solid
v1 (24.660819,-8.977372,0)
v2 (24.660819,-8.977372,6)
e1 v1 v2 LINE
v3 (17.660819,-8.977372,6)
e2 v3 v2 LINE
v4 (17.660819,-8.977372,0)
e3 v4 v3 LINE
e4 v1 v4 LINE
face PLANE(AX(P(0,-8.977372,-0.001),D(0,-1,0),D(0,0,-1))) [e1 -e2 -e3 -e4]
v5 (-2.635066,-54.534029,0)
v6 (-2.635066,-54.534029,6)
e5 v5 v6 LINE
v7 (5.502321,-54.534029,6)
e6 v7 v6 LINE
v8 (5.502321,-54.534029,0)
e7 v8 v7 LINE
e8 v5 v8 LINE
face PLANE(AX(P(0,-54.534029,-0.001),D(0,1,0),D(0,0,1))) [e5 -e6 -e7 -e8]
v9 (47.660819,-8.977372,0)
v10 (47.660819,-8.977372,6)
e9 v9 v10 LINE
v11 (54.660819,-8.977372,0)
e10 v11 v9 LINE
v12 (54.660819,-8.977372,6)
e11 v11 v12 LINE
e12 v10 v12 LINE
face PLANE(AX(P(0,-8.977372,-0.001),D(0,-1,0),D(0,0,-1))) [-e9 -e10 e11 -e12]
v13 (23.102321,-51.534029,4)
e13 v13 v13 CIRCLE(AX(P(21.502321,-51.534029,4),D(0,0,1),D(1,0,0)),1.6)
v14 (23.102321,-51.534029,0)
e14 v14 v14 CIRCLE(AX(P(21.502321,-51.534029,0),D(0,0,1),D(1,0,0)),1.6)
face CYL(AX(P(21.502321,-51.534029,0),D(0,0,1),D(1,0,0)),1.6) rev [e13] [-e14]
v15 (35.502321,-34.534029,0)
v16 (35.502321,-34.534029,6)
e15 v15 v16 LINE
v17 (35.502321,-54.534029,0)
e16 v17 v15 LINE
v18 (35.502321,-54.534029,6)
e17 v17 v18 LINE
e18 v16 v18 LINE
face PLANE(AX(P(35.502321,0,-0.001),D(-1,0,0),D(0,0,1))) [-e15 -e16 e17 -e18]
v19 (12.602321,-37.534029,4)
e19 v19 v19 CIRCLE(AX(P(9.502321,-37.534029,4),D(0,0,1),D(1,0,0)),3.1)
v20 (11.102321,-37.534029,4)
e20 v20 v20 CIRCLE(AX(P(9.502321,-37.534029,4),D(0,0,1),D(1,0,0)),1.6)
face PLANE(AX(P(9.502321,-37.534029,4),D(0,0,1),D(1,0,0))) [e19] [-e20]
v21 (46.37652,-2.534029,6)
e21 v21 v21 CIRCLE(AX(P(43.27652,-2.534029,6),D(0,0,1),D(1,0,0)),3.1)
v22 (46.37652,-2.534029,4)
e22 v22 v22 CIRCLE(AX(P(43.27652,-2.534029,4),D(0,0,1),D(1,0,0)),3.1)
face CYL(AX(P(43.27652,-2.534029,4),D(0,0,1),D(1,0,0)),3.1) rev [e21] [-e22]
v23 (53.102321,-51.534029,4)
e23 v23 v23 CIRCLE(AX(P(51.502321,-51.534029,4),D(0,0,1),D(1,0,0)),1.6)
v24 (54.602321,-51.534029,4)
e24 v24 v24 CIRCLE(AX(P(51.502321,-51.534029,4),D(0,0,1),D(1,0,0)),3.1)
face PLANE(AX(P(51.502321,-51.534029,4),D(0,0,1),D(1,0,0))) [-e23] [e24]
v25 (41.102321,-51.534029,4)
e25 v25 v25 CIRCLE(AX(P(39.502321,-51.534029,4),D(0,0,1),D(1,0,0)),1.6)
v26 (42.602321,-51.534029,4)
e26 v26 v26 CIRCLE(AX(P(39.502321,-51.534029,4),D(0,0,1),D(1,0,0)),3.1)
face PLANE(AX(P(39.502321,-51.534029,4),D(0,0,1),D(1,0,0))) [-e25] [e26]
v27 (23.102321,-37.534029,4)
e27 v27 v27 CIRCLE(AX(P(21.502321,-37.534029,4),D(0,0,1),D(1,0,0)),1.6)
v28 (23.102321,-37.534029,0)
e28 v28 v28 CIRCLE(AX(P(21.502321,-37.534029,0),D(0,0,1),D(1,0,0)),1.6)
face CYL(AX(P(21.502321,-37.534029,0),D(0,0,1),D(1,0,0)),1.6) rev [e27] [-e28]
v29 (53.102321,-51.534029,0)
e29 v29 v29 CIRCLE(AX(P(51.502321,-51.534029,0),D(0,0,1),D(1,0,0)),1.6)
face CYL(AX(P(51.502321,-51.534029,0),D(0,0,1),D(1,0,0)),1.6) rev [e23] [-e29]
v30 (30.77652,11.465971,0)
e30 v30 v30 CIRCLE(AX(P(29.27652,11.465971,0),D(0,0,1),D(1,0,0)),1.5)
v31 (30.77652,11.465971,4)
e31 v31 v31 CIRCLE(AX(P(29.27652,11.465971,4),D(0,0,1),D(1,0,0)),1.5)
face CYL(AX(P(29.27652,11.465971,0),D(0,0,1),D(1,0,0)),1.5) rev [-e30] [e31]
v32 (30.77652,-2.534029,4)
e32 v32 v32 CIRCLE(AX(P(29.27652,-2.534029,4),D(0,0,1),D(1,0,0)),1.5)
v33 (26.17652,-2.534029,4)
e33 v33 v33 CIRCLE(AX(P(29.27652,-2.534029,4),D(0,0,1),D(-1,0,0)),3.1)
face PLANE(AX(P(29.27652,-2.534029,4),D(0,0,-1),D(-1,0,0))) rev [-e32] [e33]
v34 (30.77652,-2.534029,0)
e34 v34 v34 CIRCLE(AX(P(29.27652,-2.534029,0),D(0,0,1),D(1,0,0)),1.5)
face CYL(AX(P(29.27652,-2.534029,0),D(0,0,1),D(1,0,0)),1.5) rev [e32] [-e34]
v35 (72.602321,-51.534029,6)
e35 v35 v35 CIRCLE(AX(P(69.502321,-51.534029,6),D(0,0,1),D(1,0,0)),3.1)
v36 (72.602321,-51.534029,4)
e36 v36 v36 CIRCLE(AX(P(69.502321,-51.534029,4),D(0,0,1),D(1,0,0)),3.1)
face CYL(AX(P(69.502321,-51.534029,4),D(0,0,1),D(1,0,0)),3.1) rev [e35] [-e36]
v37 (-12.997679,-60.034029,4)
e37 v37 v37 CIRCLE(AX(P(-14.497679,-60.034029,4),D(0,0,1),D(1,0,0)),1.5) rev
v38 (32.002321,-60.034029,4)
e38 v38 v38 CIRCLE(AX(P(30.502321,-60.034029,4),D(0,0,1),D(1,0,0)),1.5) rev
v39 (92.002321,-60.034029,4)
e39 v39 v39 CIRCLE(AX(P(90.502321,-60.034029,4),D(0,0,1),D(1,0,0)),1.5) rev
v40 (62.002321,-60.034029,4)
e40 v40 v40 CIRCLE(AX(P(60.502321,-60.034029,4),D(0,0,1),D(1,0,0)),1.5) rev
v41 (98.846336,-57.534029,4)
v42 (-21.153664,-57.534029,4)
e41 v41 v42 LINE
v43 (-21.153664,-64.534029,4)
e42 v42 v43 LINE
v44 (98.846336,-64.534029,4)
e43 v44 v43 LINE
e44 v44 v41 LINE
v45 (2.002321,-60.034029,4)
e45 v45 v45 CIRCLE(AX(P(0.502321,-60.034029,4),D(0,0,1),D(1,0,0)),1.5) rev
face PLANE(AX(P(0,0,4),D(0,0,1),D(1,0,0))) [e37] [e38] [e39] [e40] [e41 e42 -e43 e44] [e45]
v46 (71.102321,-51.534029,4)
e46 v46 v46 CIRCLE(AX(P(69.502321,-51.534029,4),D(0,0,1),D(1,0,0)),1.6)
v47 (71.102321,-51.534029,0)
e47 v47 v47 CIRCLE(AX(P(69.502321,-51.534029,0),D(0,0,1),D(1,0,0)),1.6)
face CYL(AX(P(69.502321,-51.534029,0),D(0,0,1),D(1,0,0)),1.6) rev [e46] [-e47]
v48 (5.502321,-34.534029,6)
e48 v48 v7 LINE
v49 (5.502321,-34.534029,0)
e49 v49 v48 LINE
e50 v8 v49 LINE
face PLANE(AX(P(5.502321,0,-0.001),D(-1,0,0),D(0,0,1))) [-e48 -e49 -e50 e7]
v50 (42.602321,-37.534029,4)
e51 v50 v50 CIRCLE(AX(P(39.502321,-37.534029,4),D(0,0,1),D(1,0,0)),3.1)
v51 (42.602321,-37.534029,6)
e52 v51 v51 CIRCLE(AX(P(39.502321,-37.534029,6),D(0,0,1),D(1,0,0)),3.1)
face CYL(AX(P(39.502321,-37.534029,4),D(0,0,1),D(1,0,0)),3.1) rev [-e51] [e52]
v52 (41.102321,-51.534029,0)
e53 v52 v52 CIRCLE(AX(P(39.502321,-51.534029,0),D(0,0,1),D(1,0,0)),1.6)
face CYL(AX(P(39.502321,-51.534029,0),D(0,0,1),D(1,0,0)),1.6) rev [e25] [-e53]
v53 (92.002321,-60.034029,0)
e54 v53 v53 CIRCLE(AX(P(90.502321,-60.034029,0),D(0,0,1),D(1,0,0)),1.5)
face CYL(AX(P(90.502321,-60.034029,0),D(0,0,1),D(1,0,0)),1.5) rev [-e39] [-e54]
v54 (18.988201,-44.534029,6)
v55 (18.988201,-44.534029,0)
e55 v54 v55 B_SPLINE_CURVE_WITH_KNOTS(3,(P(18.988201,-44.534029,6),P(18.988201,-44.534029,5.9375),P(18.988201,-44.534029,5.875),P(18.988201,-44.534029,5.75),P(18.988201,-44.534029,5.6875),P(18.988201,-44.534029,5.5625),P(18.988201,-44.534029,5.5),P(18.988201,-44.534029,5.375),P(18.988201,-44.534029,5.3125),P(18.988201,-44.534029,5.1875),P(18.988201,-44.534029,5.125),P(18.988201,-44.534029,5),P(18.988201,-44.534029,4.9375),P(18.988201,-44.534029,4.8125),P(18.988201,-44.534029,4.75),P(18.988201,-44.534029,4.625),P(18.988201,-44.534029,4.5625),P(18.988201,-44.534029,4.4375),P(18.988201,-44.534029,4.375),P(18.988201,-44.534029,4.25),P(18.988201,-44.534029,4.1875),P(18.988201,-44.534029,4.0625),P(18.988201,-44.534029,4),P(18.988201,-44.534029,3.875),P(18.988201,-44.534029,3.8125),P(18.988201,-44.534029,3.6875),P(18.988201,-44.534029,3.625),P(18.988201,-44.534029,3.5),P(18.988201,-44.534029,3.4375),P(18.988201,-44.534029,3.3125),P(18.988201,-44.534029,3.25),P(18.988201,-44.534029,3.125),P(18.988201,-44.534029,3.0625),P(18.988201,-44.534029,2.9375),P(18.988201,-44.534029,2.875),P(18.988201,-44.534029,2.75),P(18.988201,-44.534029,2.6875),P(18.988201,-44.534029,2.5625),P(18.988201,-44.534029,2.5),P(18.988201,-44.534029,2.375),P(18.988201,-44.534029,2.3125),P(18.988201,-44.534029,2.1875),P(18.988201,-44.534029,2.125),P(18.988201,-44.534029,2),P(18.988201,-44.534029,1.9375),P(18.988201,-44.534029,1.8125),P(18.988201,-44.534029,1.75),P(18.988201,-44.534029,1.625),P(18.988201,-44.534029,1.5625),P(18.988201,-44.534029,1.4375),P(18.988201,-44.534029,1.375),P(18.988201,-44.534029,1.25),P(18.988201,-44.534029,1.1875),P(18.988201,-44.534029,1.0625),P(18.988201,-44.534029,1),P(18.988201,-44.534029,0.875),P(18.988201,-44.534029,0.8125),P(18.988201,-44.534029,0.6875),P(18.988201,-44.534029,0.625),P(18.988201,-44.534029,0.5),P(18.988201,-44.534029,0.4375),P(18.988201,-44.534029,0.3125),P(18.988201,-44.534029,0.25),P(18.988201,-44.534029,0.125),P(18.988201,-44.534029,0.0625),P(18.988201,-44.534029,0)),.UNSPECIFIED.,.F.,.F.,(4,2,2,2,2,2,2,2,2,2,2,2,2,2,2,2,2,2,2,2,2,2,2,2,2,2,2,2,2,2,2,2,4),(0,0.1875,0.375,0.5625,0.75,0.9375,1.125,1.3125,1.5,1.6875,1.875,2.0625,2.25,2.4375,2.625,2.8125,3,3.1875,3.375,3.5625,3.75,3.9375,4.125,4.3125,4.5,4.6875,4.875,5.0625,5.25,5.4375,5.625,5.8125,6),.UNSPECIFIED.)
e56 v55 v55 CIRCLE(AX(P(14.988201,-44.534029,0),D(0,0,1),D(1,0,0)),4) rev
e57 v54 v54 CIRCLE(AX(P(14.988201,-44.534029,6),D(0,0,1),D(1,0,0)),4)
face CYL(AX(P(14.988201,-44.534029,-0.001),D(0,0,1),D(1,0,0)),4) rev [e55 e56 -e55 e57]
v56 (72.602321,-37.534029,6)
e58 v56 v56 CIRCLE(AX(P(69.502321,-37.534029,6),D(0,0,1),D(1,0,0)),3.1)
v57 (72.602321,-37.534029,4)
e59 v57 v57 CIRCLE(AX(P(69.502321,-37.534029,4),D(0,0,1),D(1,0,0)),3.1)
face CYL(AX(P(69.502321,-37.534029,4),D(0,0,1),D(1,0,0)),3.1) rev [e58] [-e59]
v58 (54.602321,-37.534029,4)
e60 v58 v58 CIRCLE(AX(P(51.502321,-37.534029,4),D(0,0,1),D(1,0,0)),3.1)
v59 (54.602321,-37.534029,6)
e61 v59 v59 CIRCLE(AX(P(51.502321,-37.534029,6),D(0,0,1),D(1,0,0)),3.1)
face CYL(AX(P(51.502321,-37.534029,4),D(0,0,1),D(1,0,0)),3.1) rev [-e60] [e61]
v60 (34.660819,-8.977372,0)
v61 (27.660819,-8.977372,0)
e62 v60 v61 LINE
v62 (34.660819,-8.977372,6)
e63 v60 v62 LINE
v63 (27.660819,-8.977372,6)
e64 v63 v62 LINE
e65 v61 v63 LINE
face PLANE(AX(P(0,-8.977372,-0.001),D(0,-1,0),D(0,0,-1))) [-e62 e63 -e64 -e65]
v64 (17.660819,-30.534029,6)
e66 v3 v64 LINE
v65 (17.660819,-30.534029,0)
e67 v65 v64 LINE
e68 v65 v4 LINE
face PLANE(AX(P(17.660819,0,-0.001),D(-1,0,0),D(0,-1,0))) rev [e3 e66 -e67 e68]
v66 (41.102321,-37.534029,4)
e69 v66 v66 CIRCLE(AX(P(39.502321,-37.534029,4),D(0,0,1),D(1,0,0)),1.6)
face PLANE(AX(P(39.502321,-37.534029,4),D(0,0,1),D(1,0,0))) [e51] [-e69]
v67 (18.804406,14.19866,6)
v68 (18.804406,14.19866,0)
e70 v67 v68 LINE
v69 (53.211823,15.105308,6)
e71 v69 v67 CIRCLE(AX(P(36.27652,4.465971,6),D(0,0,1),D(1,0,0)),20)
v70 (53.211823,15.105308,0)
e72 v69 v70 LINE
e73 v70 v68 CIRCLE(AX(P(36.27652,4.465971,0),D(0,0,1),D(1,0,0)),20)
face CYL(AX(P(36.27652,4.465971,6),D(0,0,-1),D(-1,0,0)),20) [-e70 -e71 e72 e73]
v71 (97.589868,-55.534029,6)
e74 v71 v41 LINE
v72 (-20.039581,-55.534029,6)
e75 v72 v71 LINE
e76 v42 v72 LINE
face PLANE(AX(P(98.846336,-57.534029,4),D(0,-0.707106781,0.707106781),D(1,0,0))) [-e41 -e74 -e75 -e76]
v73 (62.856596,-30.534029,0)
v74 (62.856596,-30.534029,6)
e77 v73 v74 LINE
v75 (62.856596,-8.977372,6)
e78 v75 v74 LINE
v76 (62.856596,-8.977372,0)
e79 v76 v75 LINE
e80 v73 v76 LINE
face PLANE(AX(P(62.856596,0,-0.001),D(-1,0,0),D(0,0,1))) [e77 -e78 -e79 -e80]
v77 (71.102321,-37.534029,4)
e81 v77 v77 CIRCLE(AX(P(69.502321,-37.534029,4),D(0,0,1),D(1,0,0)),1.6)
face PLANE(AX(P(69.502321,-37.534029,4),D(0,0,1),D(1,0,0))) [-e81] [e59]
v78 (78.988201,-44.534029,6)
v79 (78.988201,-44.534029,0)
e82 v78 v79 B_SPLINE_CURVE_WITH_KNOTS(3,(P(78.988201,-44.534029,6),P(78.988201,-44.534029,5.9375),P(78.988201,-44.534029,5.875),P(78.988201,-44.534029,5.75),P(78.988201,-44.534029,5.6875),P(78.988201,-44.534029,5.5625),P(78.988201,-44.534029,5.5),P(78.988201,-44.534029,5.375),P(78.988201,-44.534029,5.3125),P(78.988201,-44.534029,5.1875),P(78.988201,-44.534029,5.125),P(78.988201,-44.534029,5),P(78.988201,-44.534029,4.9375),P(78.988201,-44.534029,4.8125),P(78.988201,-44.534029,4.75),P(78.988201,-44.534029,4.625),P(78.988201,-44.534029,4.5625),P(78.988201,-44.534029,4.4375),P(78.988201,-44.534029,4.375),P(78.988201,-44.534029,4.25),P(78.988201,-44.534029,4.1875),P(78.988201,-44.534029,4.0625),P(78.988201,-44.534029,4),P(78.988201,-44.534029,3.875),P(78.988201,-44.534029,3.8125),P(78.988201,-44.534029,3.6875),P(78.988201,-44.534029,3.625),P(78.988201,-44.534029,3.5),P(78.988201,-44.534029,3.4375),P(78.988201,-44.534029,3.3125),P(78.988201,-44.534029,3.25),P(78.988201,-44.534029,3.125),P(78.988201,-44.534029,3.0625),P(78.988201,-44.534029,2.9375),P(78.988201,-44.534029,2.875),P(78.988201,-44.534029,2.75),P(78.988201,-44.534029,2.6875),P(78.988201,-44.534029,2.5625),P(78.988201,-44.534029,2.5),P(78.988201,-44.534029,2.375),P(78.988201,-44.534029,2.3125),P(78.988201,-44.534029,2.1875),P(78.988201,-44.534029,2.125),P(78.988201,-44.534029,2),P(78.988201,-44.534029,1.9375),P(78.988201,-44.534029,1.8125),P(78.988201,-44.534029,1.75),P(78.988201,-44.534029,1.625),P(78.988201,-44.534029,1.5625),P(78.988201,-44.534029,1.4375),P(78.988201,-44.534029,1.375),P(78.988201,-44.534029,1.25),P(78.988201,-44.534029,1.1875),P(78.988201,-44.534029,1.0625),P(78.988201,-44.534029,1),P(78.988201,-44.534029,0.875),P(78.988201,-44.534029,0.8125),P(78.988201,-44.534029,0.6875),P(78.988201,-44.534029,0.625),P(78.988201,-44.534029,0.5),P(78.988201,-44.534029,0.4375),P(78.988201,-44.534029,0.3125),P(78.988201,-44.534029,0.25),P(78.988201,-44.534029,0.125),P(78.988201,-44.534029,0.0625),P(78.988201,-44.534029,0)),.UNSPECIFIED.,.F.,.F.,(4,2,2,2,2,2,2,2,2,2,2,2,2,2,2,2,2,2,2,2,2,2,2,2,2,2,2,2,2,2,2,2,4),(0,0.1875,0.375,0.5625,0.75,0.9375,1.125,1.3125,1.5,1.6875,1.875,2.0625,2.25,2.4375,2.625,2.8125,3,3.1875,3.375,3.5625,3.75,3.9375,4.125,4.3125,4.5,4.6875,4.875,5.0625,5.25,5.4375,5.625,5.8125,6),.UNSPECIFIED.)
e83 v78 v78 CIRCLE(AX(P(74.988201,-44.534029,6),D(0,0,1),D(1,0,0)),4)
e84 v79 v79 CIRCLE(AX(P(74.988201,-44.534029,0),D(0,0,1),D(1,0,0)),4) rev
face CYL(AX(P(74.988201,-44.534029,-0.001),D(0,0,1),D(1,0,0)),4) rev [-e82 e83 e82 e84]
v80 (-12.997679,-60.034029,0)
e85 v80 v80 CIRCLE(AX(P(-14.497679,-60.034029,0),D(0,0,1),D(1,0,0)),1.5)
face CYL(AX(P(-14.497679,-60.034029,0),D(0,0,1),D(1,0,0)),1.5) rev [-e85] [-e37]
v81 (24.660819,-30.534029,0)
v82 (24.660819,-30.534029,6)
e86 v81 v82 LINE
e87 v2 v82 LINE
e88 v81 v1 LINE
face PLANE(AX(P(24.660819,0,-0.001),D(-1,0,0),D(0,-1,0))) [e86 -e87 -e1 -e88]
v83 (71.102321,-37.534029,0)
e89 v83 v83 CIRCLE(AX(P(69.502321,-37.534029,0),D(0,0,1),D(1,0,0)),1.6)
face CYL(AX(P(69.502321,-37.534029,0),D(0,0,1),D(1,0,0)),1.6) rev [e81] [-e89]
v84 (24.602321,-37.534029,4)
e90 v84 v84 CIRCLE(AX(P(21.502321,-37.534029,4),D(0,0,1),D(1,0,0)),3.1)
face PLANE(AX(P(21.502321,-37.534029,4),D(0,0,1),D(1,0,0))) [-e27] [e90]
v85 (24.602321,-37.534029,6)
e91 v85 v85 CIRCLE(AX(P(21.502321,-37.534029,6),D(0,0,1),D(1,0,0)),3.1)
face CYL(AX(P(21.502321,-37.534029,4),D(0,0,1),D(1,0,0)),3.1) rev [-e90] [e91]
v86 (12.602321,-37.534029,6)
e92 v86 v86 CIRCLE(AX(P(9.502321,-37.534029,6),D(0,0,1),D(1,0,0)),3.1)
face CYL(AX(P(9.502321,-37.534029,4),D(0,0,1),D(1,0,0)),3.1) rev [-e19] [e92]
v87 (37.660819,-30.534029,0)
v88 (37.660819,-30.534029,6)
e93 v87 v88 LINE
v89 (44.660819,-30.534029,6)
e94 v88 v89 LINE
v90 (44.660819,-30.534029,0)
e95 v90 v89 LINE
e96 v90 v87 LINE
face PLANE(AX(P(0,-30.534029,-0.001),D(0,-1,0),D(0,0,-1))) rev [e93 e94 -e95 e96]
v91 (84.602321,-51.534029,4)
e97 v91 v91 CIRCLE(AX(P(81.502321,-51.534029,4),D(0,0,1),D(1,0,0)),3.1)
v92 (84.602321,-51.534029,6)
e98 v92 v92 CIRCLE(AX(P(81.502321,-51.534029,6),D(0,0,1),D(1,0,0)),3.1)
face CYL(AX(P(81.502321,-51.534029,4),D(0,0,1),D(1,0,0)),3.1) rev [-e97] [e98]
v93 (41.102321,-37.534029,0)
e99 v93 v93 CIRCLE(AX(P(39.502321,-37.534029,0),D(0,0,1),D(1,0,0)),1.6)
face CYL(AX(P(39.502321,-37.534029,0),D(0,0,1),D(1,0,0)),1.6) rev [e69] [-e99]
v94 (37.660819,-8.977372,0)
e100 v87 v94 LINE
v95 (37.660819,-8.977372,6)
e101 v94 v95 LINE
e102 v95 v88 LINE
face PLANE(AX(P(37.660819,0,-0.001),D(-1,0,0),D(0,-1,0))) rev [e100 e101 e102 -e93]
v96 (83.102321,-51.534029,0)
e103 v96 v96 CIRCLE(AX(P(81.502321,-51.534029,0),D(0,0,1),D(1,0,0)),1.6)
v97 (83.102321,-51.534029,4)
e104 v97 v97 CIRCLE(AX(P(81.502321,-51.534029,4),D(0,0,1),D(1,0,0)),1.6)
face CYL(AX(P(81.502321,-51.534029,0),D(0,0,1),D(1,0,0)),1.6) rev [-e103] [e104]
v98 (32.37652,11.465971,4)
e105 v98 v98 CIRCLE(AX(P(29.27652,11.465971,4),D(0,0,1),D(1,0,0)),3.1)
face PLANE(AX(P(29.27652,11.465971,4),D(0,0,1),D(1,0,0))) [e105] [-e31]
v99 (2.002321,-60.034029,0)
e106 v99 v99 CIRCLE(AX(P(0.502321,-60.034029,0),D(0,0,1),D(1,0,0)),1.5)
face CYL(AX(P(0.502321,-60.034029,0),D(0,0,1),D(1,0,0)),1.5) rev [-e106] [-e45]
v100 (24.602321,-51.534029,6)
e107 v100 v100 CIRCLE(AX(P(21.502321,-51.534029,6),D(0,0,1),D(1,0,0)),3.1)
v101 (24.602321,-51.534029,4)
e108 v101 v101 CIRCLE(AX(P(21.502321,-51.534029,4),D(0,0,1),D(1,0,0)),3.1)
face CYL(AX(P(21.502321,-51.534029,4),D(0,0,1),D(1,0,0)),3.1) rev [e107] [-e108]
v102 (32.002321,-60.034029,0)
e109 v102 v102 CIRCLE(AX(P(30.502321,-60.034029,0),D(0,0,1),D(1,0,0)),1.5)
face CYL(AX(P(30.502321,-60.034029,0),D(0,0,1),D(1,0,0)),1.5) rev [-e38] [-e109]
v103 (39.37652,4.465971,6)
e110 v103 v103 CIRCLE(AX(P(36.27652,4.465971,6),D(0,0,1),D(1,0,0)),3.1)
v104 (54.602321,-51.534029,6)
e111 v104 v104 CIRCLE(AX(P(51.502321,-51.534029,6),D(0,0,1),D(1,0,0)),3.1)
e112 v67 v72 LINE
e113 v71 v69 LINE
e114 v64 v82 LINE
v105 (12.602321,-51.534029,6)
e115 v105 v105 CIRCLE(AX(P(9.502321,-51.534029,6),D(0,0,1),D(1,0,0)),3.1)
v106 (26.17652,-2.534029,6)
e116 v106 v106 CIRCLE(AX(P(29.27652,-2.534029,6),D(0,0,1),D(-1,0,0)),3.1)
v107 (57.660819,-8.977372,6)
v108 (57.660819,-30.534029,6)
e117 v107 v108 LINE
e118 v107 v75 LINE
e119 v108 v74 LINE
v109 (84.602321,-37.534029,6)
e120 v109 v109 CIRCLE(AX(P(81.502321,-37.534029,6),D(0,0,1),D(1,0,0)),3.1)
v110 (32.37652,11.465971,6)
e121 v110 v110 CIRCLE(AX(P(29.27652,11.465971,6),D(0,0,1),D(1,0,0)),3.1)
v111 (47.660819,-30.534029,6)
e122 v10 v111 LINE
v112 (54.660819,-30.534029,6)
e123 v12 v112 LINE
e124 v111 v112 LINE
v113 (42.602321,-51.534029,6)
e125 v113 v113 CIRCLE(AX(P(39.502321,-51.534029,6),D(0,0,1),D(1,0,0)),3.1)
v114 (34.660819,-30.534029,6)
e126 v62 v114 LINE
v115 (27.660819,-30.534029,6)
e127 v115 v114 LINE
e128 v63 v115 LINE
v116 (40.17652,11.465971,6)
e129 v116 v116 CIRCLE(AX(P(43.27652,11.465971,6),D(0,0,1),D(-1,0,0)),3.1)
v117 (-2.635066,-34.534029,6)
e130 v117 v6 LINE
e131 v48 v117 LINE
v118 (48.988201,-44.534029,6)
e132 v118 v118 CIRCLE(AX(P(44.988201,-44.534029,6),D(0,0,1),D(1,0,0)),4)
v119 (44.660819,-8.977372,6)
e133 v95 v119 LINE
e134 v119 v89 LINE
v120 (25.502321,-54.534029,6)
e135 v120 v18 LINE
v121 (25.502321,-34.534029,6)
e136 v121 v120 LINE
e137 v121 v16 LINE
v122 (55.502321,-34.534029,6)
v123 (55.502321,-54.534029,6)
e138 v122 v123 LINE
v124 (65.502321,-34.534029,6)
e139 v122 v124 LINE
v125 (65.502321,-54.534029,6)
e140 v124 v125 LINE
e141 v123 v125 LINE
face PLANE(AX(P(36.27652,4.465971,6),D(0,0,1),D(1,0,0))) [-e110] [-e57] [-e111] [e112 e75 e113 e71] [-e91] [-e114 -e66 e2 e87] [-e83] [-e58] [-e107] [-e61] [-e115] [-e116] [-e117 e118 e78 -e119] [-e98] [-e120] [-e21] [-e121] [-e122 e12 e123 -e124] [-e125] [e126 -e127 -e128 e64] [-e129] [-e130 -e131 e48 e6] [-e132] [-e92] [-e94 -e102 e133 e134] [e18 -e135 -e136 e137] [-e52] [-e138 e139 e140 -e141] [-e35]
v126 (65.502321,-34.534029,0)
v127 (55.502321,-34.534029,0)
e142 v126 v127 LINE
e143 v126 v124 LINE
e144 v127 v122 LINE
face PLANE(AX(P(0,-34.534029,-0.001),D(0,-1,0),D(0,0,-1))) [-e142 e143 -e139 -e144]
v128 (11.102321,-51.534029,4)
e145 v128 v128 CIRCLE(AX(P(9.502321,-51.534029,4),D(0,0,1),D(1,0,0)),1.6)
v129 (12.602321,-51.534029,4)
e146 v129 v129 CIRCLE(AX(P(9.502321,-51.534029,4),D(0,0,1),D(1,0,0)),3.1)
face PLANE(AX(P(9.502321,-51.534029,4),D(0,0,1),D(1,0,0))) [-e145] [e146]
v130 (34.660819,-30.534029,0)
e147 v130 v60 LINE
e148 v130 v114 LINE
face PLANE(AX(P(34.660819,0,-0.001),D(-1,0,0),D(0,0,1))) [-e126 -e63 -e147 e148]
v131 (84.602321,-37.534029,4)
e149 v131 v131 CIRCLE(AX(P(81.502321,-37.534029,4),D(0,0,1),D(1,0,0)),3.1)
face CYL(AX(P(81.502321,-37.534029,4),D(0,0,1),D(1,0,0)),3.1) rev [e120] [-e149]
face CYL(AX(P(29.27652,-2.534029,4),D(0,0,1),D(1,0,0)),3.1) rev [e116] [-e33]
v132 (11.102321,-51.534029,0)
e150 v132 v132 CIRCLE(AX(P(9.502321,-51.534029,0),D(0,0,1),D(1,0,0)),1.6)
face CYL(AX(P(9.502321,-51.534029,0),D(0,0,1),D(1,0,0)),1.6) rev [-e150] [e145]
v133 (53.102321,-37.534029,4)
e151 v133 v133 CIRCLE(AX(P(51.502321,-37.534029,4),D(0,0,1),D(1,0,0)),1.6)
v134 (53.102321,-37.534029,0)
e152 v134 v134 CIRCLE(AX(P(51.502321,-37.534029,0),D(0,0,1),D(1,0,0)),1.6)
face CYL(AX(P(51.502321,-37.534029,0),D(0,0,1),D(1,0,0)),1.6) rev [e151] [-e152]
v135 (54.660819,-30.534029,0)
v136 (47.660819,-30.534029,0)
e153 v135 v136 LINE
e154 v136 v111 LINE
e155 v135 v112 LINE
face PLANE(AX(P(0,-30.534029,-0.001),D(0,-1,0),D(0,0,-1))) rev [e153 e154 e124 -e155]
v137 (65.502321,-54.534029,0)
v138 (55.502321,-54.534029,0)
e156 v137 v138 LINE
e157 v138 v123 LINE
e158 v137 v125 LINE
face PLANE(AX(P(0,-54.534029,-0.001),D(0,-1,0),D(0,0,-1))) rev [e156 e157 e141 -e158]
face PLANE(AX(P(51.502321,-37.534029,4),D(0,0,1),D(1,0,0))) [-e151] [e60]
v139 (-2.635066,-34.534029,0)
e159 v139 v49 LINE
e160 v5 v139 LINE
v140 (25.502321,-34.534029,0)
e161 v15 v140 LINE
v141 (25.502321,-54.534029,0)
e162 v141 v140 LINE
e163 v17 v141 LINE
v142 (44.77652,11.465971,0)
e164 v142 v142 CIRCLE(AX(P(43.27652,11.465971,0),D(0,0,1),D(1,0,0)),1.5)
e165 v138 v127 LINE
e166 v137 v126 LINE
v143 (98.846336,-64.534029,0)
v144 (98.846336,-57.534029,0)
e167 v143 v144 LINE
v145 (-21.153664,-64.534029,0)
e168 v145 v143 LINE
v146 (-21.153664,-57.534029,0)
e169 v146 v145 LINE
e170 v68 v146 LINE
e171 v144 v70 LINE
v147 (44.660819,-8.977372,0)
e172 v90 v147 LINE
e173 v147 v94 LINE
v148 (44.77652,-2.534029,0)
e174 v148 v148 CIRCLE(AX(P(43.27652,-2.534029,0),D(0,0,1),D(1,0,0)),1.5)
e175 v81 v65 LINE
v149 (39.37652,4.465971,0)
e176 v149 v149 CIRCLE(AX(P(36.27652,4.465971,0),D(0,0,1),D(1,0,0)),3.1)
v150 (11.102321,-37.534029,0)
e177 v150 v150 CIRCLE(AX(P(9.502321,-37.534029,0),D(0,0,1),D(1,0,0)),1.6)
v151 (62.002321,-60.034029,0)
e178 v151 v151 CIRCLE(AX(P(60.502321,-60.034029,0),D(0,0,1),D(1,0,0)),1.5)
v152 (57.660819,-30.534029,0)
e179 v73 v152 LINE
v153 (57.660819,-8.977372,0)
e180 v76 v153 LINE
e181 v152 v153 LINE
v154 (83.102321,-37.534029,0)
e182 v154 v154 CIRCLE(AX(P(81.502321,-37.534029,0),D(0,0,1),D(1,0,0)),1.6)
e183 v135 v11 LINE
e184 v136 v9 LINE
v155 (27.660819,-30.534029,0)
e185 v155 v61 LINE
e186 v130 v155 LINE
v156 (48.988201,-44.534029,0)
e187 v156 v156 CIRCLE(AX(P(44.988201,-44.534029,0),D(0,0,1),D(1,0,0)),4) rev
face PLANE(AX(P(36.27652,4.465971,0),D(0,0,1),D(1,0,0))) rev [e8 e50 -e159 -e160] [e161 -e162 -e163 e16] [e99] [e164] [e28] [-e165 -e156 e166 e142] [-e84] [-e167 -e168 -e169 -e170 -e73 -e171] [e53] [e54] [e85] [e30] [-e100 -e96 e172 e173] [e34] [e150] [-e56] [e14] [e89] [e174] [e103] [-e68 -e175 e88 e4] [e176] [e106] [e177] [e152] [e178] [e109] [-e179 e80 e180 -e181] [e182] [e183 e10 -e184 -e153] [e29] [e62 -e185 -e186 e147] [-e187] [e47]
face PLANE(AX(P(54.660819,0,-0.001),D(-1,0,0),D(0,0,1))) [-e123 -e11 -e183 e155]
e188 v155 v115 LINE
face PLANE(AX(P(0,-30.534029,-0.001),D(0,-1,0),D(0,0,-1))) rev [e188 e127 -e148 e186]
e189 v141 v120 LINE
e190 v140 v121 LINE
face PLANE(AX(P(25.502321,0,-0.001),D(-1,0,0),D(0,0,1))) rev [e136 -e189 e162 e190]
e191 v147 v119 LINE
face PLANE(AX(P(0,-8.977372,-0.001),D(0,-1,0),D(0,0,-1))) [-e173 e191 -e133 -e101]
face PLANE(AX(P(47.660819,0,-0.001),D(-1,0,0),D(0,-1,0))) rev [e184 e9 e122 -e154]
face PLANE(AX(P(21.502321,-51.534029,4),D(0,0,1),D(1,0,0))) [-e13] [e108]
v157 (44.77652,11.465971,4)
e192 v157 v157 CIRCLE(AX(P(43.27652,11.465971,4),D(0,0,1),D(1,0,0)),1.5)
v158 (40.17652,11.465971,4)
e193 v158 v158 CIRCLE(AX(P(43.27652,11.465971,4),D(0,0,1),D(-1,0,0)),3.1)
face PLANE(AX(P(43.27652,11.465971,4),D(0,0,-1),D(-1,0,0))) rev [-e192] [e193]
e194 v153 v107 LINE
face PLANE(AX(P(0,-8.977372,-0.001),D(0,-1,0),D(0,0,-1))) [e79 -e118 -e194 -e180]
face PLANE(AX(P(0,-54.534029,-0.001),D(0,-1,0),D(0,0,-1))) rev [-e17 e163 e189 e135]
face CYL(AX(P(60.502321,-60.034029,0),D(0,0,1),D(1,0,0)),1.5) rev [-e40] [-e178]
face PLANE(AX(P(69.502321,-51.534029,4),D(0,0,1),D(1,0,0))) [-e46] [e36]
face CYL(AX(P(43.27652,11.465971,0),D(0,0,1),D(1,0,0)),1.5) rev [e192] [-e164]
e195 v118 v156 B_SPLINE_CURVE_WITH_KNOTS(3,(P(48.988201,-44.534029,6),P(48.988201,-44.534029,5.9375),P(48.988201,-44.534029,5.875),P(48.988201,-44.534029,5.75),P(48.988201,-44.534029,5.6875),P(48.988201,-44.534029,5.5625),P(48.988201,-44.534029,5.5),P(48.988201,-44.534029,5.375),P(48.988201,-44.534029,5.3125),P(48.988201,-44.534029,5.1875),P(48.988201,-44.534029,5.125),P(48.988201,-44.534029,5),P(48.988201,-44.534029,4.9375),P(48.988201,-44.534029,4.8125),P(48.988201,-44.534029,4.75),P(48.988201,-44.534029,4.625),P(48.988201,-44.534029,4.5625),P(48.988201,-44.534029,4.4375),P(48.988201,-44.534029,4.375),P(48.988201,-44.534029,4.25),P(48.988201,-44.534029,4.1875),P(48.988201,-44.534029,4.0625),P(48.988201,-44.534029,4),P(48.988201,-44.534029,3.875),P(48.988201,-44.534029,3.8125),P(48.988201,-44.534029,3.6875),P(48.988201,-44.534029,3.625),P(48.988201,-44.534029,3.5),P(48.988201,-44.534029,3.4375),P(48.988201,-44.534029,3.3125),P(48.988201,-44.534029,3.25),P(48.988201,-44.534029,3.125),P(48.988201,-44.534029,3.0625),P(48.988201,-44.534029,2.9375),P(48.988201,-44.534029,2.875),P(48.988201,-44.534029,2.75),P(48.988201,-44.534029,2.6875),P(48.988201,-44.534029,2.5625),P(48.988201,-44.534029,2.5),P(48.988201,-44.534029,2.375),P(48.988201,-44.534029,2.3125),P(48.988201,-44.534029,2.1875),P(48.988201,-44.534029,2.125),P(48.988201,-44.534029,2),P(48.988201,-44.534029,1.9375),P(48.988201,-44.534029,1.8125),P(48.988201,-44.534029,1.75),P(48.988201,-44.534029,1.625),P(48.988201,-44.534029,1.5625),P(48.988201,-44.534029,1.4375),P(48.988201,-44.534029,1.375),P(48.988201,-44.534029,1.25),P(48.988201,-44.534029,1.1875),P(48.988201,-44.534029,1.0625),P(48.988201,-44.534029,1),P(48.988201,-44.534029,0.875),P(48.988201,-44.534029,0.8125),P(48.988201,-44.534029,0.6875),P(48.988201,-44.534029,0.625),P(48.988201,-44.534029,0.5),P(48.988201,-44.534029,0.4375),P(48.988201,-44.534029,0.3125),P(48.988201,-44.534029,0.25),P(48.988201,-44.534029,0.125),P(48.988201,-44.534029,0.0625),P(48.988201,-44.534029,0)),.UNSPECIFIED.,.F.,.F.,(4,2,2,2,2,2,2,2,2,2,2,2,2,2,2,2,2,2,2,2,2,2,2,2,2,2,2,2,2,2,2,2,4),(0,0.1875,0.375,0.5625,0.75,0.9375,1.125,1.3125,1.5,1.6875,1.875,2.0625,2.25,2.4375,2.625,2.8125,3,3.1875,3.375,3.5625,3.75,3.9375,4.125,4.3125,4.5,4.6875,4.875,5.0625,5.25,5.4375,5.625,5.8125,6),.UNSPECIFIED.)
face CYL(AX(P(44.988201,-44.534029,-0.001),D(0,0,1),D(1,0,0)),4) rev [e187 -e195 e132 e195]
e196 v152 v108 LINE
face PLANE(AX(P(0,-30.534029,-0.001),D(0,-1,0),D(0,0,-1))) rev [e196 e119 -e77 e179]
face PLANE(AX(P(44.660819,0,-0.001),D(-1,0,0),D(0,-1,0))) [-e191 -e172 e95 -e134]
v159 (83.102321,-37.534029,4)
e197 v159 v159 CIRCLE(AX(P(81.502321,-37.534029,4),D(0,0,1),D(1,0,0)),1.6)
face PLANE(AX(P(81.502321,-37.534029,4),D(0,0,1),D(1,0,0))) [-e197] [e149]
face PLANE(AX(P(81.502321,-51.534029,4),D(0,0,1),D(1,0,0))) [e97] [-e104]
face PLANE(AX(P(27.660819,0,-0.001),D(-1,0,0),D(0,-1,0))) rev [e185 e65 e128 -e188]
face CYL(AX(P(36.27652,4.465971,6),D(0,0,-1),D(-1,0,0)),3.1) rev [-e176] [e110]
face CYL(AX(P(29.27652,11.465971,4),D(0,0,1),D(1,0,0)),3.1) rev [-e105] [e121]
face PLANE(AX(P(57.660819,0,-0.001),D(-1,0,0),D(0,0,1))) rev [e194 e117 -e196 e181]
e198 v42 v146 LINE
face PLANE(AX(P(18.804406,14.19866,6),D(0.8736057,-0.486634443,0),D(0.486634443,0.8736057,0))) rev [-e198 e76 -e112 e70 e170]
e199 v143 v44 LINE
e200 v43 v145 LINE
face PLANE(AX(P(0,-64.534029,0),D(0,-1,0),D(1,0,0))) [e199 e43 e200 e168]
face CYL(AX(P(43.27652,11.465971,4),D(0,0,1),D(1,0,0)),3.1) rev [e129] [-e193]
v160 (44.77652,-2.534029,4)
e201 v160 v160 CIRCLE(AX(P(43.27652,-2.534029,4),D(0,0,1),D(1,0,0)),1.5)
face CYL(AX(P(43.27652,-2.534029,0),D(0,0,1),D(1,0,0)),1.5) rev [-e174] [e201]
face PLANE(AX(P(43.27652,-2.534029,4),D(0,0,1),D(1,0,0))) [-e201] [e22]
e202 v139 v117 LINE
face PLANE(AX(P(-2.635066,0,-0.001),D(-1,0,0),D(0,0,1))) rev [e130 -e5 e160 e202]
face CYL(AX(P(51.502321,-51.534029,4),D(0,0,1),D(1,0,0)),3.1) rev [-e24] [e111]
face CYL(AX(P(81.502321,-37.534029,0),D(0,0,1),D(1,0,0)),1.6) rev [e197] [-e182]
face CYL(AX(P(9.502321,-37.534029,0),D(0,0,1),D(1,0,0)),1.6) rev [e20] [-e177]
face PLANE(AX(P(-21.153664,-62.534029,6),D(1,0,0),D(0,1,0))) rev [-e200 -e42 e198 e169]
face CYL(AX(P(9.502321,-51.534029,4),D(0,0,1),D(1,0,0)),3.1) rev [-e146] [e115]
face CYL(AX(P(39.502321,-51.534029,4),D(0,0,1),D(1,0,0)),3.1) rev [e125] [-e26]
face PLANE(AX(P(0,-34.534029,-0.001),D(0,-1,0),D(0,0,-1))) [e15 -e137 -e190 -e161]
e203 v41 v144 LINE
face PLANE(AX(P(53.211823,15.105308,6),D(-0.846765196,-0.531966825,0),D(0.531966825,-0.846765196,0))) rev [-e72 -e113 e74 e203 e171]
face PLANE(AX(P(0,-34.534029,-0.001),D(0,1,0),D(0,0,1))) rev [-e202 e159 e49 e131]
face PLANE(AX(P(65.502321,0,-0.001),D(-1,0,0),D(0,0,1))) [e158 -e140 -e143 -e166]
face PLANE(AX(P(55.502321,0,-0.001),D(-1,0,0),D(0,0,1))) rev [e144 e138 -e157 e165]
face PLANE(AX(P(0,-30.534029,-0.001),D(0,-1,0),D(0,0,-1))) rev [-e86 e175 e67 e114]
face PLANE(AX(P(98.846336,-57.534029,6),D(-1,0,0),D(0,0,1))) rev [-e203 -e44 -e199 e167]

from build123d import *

# Parameters (mm, degrees)
SKETCH_1_R           = 3.1
EXTRUDE_1_DEPTH      = 6
SKETCH_2_R           = 3.1
CUT_EXTRUDE_6_DEPTH  = 2
SKETCH_4_R           = 1.5
CUT_EXTRUDE_7_DEPTH  = 118.034622889
CUT_EXTRUDE_8_REACH  = 119.12
SKETCH_5_W           = 7
SKETCH_5_H           = 21.556656584
SKETCH_5_W_2         = 5.195776916
SKETCH_5_R           = 4
SKETCH_5_W_3         = 8.137387099
SKETCH_5_H_2         = 20
SKETCH_5_W_4         = 10
SKETCH_6_R           = 3.1
CUT_EXTRUDE_9_DEPTH  = 2
SKETCH_7_R           = 1.6
CUT_EXTRUDE_10_DEPTH = 118.034622889
SKETCH_8_R           = 1.5
CUT_EXTRUDE_11_DEPTH = 118.120036521
SKETCH_9_W           = 120
SKETCH_9_H           = 5
CUT_EXTRUDE_12_DEPTH = 2
CHAMFER_1_SIZE       = 2
SKETCH_10_W          = 120
SKETCH_10_H          = 4
EXTRUDE_2_DEPTH      = 2


with BuildPart() as part:
    # 草图1 → 凸台-拉伸1 (new body)
    with BuildSketch(Plane.XY):
        with BuildLine():
            Line((53.211823486, 15.105307707), (98.846336292, -57.534028788))
            Line((98.846336292, -57.534028788), (98.846336292, -62.534028788))
            Line((98.846336292, -62.534028788), (-21.153663708, -62.534028788))
            Line((-21.153663708, -62.534028788), (-21.153663708, -57.534028788))
            Line((-21.153663708, -57.534028788), (18.804405563, 14.198660069))
            ThreePointArc((18.804405563, 14.198660069), (35.749695352, 24.459031414), (53.211823486, 15.105307707))
        make_face()
        with Locations((36.276519563, 4.465971212)):
            Circle(SKETCH_1_R, mode=Mode.SUBTRACT)
    extrude(amount=EXTRUDE_1_DEPTH)

    # 草图2 → 切除-拉伸6 (cut)
    with BuildSketch(Plane.XY.offset(6)):
        with Locations((29.276519563, 11.465971212)):
            Circle(SKETCH_2_R)
        with Locations(Location((43.276519563, 11.465971212, 0), (0, 0, 180))):
            Circle(SKETCH_2_R)
        with Locations((43.276519563, -2.534028788)):
            Circle(SKETCH_2_R)
        with Locations(Location((29.276519563, -2.534028788, 0), (0, 0, 180))):
            Circle(SKETCH_2_R)
    extrude(amount=-CUT_EXTRUDE_6_DEPTH, mode=Mode.SUBTRACT)

    # 草图4 → 切除-拉伸7 (cut, through all)
    with BuildSketch(Plane.XY.offset(4)):
        with Locations((43.276519563, 11.465971212)):
            Circle(SKETCH_4_R)
        with Locations((43.276519563, -2.534028788)):
            Circle(SKETCH_4_R)
        with Locations((29.276519563, -2.534028788)):
            Circle(SKETCH_4_R)
        with Locations((29.276519563, 11.465971212)):
            Circle(SKETCH_4_R)
    extrude(amount=-CUT_EXTRUDE_7_DEPTH, mode=Mode.SUBTRACT)

    # 草图5 → 切除-拉伸8 (cut, up to next)
    with BuildSketch(Plane.XY.offset(6), mode=Mode.PRIVATE) as cut_extrude_8_sk1:
        with Locations((21.160819148, -19.755700496)):
            Rectangle(SKETCH_5_W, SKETCH_5_H)
    cut_extrude_8_tool1 = extrude(cut_extrude_8_sk1.sketch, amount=-CUT_EXTRUDE_8_REACH, mode=Mode.PRIVATE) & part.part
    # 草图5 → 切除-拉伸8 (cut, up to next)
    with BuildSketch(Plane.XY.offset(6), mode=Mode.PRIVATE) as cut_extrude_8_sk2:
        with Locations((31.160819148, -19.755700496)):
            Rectangle(SKETCH_5_W, SKETCH_5_H)
    cut_extrude_8_tool2 = extrude(cut_extrude_8_sk2.sketch, amount=-CUT_EXTRUDE_8_REACH, mode=Mode.PRIVATE) & part.part
    # 草图5 → 切除-拉伸8 (cut, up to next)
    with BuildSketch(Plane.XY.offset(6), mode=Mode.PRIVATE) as cut_extrude_8_sk3:
        with Locations((41.160819148, -19.755700496)):
            Rectangle(SKETCH_5_W, SKETCH_5_H)
    cut_extrude_8_tool3 = extrude(cut_extrude_8_sk3.sketch, amount=-CUT_EXTRUDE_8_REACH, mode=Mode.PRIVATE) & part.part
    # 草图5 → 切除-拉伸8 (cut, up to next)
    with BuildSketch(Plane.XY.offset(6), mode=Mode.PRIVATE) as cut_extrude_8_sk4:
        with Locations((51.160819148, -19.755700496)):
            Rectangle(SKETCH_5_W, SKETCH_5_H)
    cut_extrude_8_tool4 = extrude(cut_extrude_8_sk4.sketch, amount=-CUT_EXTRUDE_8_REACH, mode=Mode.PRIVATE) & part.part
    # 草图5 → 切除-拉伸8 (cut, up to next)
    with BuildSketch(Plane.XY.offset(6), mode=Mode.PRIVATE) as cut_extrude_8_sk5:
        with Locations((60.258707606, -19.755700496)):
            Rectangle(SKETCH_5_W_2, SKETCH_5_H)
    cut_extrude_8_tool5 = extrude(cut_extrude_8_sk5.sketch, amount=-CUT_EXTRUDE_8_REACH, mode=Mode.PRIVATE) & part.part
    # 草图5 → 切除-拉伸8 (cut, up to next)
    with BuildSketch(Plane.XY.offset(6), mode=Mode.PRIVATE) as cut_extrude_8_sk6:
        with Locations((14.988200827, -44.534028788)):
            Circle(SKETCH_5_R)
    cut_extrude_8_tool6 = extrude(cut_extrude_8_sk6.sketch, amount=-CUT_EXTRUDE_8_REACH, mode=Mode.PRIVATE) & part.part
    # 草图5 → 切除-拉伸8 (cut, up to next)
    with BuildSketch(Plane.XY.offset(6), mode=Mode.PRIVATE) as cut_extrude_8_sk7:
        with Locations((44.988200827, -44.534028788)):
            Circle(SKETCH_5_R)
    cut_extrude_8_tool7 = extrude(cut_extrude_8_sk7.sketch, amount=-CUT_EXTRUDE_8_REACH, mode=Mode.PRIVATE) & part.part
    # 草图5 → 切除-拉伸8 (cut, up to next)
    with BuildSketch(Plane.XY.offset(6), mode=Mode.PRIVATE) as cut_extrude_8_sk8:
        with Locations((74.988200827, -44.534028788)):
            Circle(SKETCH_5_R)
    cut_extrude_8_tool8 = extrude(cut_extrude_8_sk8.sketch, amount=-CUT_EXTRUDE_8_REACH, mode=Mode.PRIVATE) & part.part
    # 草图5 → 切除-拉伸8 (cut, up to next)
    with BuildSketch(Plane.XY.offset(6), mode=Mode.PRIVATE) as cut_extrude_8_sk9:
        with Locations((1.433627507, -44.534028788)):
            Rectangle(SKETCH_5_W_3, SKETCH_5_H_2)
    cut_extrude_8_tool9 = extrude(cut_extrude_8_sk9.sketch, amount=-CUT_EXTRUDE_8_REACH, mode=Mode.PRIVATE) & part.part
    # 草图5 → 切除-拉伸8 (cut, up to next)
    with BuildSketch(Plane.XY.offset(6), mode=Mode.PRIVATE) as cut_extrude_8_sk10:
        with Locations((30.502321056, -44.534028788)):
            Rectangle(SKETCH_5_W_4, SKETCH_5_H_2)
    cut_extrude_8_tool10 = extrude(cut_extrude_8_sk10.sketch, amount=-CUT_EXTRUDE_8_REACH, mode=Mode.PRIVATE) & part.part
    # 草图5 → 切除-拉伸8 (cut, up to next)
    with BuildSketch(Plane.XY.offset(6), mode=Mode.PRIVATE) as cut_extrude_8_sk11:
        with Locations((60.502321056, -44.534028788)):
            Rectangle(SKETCH_5_W_4, SKETCH_5_H_2)
    cut_extrude_8_tool11 = extrude(cut_extrude_8_sk11.sketch, amount=-CUT_EXTRUDE_8_REACH, mode=Mode.PRIVATE) & part.part
    add(cut_extrude_8_tool1.solids().sort_by_distance((21.160819, -19.7557, 6))[0], mode=Mode.SUBTRACT)
    add(cut_extrude_8_tool2.solids().sort_by_distance((31.160819, -19.7557, 6))[0], mode=Mode.SUBTRACT)
    add(cut_extrude_8_tool3.solids().sort_by_distance((41.160819, -19.7557, 6))[0], mode=Mode.SUBTRACT)
    add(cut_extrude_8_tool4.solids().sort_by_distance((51.160819, -19.7557, 6))[0], mode=Mode.SUBTRACT)
    add(cut_extrude_8_tool5.solids().sort_by_distance((60.258708, -19.7557, 6))[0], mode=Mode.SUBTRACT)
    add(cut_extrude_8_tool6.solids().sort_by_distance((14.988201, -44.534029, 6))[0], mode=Mode.SUBTRACT)
    add(cut_extrude_8_tool7.solids().sort_by_distance((44.988201, -44.534029, 6))[0], mode=Mode.SUBTRACT)
    add(cut_extrude_8_tool8.solids().sort_by_distance((74.988201, -44.534029, 6))[0], mode=Mode.SUBTRACT)
    add(cut_extrude_8_tool9.solids().sort_by_distance((1.433628, -44.534029, 6))[0], mode=Mode.SUBTRACT)
    add(cut_extrude_8_tool10.solids().sort_by_distance((30.502321, -44.534029, 6))[0], mode=Mode.SUBTRACT)
    add(cut_extrude_8_tool11.solids().sort_by_distance((60.502321, -44.534029, 6))[0], mode=Mode.SUBTRACT)

    # 草图6 → 切除-拉伸9 (cut)
    with BuildSketch(Plane.XY.offset(6)):
        with Locations((21.502321056, -37.534028788)):
            Circle(SKETCH_6_R)
        with Locations((9.502321056, -37.534028788)):
            Circle(SKETCH_6_R)
        with Locations((9.502321056, -51.534028788)):
            Circle(SKETCH_6_R)
        with Locations((21.502321056, -51.534028788)):
            Circle(SKETCH_6_R)
        with Locations((39.502321056, -37.534028788)):
            Circle(SKETCH_6_R)
        with Locations((51.502321056, -37.534028788)):
            Circle(SKETCH_6_R)
        with Locations((51.502321056, -51.534028788)):
            Circle(SKETCH_6_R)
        with Locations((39.502321056, -51.534028788)):
            Circle(SKETCH_6_R)
        with Locations((69.502321056, -37.534028788)):
            Circle(SKETCH_6_R)
        with Locations((81.502321056, -37.534028788)):
            Circle(SKETCH_6_R)
        with Locations((81.502321056, -51.534028788)):
            Circle(SKETCH_6_R)
        with Locations((69.502321056, -51.534028788)):
            Circle(SKETCH_6_R)
    extrude(amount=-CUT_EXTRUDE_9_DEPTH, mode=Mode.SUBTRACT)

    # 草图7 → 切除-拉伸10 (cut, through all)
    with BuildSketch(Plane.XY.offset(4)):
        with Locations((9.502321056, -37.534028788)):
            Circle(SKETCH_7_R)
        with Locations((21.502321056, -37.534028788)):
            Circle(SKETCH_7_R)
        with Locations((9.502321056, -51.534028788)):
            Circle(SKETCH_7_R)
        with Locations((21.502321056, -51.534028788)):
            Circle(SKETCH_7_R)
        with Locations((51.502321056, -51.534028788)):
            Circle(SKETCH_7_R)
        with Locations((39.502321056, -51.534028788)):
            Circle(SKETCH_7_R)
        with Locations((39.502321056, -37.534028788)):
            Circle(SKETCH_7_R)
        with Locations((51.502321056, -37.534028788)):
            Circle(SKETCH_7_R)
        with Locations((81.502321056, -51.534028788)):
            Circle(SKETCH_7_R)
        with Locations((69.502321056, -51.534028788)):
            Circle(SKETCH_7_R)
        with Locations((69.502321056, -37.534028788)):
            Circle(SKETCH_7_R)
        with Locations((81.502321056, -37.534028788)):
            Circle(SKETCH_7_R)
    extrude(amount=-CUT_EXTRUDE_10_DEPTH, mode=Mode.SUBTRACT)

    # 草图8 → 切除-拉伸11 (cut, through all)
    with BuildSketch(Plane.XY.offset(6)):
        with Locations((90.502321056, -60.034028788)):
            Circle(SKETCH_8_R)
        with Locations((60.502321056, -60.034028788)):
            Circle(SKETCH_8_R)
        with Locations((30.502321056, -60.034028788)):
            Circle(SKETCH_8_R)
        with Locations((0.502321056, -60.034028788)):
            Circle(SKETCH_8_R)
        with Locations((-14.497678944, -60.034028788)):
            Circle(SKETCH_8_R)
    extrude(amount=-CUT_EXTRUDE_11_DEPTH, mode=Mode.SUBTRACT)

    # 草图9 → 切除-拉伸12 (cut)
    with BuildSketch(Plane.XY.offset(6)):
        with Locations((38.846336292, -60.034028788)):
            Rectangle(SKETCH_9_W, SKETCH_9_H)
    extrude(amount=-CUT_EXTRUDE_12_DEPTH, mode=Mode.SUBTRACT)

    # 倒角1
    chamfer_1_edges = [part.edges().sort_by_distance(p)[0] for p in [
        (38.846336292, -57.534028788, 6),
    ]]
    chamfer(chamfer_1_edges, length=CHAMFER_1_SIZE - 0.0001)  # a hair under: the kernel refuses the full size

    # 草图10 → 凸台-拉伸2 (add)
    with BuildSketch(Plane.XZ.offset(62.534028788)):
        with Locations((38.846336292, 2)):
            Rectangle(SKETCH_10_W, SKETCH_10_H)
    extrude(amount=EXTRUDE_2_DEPTH)


solid = part.part
